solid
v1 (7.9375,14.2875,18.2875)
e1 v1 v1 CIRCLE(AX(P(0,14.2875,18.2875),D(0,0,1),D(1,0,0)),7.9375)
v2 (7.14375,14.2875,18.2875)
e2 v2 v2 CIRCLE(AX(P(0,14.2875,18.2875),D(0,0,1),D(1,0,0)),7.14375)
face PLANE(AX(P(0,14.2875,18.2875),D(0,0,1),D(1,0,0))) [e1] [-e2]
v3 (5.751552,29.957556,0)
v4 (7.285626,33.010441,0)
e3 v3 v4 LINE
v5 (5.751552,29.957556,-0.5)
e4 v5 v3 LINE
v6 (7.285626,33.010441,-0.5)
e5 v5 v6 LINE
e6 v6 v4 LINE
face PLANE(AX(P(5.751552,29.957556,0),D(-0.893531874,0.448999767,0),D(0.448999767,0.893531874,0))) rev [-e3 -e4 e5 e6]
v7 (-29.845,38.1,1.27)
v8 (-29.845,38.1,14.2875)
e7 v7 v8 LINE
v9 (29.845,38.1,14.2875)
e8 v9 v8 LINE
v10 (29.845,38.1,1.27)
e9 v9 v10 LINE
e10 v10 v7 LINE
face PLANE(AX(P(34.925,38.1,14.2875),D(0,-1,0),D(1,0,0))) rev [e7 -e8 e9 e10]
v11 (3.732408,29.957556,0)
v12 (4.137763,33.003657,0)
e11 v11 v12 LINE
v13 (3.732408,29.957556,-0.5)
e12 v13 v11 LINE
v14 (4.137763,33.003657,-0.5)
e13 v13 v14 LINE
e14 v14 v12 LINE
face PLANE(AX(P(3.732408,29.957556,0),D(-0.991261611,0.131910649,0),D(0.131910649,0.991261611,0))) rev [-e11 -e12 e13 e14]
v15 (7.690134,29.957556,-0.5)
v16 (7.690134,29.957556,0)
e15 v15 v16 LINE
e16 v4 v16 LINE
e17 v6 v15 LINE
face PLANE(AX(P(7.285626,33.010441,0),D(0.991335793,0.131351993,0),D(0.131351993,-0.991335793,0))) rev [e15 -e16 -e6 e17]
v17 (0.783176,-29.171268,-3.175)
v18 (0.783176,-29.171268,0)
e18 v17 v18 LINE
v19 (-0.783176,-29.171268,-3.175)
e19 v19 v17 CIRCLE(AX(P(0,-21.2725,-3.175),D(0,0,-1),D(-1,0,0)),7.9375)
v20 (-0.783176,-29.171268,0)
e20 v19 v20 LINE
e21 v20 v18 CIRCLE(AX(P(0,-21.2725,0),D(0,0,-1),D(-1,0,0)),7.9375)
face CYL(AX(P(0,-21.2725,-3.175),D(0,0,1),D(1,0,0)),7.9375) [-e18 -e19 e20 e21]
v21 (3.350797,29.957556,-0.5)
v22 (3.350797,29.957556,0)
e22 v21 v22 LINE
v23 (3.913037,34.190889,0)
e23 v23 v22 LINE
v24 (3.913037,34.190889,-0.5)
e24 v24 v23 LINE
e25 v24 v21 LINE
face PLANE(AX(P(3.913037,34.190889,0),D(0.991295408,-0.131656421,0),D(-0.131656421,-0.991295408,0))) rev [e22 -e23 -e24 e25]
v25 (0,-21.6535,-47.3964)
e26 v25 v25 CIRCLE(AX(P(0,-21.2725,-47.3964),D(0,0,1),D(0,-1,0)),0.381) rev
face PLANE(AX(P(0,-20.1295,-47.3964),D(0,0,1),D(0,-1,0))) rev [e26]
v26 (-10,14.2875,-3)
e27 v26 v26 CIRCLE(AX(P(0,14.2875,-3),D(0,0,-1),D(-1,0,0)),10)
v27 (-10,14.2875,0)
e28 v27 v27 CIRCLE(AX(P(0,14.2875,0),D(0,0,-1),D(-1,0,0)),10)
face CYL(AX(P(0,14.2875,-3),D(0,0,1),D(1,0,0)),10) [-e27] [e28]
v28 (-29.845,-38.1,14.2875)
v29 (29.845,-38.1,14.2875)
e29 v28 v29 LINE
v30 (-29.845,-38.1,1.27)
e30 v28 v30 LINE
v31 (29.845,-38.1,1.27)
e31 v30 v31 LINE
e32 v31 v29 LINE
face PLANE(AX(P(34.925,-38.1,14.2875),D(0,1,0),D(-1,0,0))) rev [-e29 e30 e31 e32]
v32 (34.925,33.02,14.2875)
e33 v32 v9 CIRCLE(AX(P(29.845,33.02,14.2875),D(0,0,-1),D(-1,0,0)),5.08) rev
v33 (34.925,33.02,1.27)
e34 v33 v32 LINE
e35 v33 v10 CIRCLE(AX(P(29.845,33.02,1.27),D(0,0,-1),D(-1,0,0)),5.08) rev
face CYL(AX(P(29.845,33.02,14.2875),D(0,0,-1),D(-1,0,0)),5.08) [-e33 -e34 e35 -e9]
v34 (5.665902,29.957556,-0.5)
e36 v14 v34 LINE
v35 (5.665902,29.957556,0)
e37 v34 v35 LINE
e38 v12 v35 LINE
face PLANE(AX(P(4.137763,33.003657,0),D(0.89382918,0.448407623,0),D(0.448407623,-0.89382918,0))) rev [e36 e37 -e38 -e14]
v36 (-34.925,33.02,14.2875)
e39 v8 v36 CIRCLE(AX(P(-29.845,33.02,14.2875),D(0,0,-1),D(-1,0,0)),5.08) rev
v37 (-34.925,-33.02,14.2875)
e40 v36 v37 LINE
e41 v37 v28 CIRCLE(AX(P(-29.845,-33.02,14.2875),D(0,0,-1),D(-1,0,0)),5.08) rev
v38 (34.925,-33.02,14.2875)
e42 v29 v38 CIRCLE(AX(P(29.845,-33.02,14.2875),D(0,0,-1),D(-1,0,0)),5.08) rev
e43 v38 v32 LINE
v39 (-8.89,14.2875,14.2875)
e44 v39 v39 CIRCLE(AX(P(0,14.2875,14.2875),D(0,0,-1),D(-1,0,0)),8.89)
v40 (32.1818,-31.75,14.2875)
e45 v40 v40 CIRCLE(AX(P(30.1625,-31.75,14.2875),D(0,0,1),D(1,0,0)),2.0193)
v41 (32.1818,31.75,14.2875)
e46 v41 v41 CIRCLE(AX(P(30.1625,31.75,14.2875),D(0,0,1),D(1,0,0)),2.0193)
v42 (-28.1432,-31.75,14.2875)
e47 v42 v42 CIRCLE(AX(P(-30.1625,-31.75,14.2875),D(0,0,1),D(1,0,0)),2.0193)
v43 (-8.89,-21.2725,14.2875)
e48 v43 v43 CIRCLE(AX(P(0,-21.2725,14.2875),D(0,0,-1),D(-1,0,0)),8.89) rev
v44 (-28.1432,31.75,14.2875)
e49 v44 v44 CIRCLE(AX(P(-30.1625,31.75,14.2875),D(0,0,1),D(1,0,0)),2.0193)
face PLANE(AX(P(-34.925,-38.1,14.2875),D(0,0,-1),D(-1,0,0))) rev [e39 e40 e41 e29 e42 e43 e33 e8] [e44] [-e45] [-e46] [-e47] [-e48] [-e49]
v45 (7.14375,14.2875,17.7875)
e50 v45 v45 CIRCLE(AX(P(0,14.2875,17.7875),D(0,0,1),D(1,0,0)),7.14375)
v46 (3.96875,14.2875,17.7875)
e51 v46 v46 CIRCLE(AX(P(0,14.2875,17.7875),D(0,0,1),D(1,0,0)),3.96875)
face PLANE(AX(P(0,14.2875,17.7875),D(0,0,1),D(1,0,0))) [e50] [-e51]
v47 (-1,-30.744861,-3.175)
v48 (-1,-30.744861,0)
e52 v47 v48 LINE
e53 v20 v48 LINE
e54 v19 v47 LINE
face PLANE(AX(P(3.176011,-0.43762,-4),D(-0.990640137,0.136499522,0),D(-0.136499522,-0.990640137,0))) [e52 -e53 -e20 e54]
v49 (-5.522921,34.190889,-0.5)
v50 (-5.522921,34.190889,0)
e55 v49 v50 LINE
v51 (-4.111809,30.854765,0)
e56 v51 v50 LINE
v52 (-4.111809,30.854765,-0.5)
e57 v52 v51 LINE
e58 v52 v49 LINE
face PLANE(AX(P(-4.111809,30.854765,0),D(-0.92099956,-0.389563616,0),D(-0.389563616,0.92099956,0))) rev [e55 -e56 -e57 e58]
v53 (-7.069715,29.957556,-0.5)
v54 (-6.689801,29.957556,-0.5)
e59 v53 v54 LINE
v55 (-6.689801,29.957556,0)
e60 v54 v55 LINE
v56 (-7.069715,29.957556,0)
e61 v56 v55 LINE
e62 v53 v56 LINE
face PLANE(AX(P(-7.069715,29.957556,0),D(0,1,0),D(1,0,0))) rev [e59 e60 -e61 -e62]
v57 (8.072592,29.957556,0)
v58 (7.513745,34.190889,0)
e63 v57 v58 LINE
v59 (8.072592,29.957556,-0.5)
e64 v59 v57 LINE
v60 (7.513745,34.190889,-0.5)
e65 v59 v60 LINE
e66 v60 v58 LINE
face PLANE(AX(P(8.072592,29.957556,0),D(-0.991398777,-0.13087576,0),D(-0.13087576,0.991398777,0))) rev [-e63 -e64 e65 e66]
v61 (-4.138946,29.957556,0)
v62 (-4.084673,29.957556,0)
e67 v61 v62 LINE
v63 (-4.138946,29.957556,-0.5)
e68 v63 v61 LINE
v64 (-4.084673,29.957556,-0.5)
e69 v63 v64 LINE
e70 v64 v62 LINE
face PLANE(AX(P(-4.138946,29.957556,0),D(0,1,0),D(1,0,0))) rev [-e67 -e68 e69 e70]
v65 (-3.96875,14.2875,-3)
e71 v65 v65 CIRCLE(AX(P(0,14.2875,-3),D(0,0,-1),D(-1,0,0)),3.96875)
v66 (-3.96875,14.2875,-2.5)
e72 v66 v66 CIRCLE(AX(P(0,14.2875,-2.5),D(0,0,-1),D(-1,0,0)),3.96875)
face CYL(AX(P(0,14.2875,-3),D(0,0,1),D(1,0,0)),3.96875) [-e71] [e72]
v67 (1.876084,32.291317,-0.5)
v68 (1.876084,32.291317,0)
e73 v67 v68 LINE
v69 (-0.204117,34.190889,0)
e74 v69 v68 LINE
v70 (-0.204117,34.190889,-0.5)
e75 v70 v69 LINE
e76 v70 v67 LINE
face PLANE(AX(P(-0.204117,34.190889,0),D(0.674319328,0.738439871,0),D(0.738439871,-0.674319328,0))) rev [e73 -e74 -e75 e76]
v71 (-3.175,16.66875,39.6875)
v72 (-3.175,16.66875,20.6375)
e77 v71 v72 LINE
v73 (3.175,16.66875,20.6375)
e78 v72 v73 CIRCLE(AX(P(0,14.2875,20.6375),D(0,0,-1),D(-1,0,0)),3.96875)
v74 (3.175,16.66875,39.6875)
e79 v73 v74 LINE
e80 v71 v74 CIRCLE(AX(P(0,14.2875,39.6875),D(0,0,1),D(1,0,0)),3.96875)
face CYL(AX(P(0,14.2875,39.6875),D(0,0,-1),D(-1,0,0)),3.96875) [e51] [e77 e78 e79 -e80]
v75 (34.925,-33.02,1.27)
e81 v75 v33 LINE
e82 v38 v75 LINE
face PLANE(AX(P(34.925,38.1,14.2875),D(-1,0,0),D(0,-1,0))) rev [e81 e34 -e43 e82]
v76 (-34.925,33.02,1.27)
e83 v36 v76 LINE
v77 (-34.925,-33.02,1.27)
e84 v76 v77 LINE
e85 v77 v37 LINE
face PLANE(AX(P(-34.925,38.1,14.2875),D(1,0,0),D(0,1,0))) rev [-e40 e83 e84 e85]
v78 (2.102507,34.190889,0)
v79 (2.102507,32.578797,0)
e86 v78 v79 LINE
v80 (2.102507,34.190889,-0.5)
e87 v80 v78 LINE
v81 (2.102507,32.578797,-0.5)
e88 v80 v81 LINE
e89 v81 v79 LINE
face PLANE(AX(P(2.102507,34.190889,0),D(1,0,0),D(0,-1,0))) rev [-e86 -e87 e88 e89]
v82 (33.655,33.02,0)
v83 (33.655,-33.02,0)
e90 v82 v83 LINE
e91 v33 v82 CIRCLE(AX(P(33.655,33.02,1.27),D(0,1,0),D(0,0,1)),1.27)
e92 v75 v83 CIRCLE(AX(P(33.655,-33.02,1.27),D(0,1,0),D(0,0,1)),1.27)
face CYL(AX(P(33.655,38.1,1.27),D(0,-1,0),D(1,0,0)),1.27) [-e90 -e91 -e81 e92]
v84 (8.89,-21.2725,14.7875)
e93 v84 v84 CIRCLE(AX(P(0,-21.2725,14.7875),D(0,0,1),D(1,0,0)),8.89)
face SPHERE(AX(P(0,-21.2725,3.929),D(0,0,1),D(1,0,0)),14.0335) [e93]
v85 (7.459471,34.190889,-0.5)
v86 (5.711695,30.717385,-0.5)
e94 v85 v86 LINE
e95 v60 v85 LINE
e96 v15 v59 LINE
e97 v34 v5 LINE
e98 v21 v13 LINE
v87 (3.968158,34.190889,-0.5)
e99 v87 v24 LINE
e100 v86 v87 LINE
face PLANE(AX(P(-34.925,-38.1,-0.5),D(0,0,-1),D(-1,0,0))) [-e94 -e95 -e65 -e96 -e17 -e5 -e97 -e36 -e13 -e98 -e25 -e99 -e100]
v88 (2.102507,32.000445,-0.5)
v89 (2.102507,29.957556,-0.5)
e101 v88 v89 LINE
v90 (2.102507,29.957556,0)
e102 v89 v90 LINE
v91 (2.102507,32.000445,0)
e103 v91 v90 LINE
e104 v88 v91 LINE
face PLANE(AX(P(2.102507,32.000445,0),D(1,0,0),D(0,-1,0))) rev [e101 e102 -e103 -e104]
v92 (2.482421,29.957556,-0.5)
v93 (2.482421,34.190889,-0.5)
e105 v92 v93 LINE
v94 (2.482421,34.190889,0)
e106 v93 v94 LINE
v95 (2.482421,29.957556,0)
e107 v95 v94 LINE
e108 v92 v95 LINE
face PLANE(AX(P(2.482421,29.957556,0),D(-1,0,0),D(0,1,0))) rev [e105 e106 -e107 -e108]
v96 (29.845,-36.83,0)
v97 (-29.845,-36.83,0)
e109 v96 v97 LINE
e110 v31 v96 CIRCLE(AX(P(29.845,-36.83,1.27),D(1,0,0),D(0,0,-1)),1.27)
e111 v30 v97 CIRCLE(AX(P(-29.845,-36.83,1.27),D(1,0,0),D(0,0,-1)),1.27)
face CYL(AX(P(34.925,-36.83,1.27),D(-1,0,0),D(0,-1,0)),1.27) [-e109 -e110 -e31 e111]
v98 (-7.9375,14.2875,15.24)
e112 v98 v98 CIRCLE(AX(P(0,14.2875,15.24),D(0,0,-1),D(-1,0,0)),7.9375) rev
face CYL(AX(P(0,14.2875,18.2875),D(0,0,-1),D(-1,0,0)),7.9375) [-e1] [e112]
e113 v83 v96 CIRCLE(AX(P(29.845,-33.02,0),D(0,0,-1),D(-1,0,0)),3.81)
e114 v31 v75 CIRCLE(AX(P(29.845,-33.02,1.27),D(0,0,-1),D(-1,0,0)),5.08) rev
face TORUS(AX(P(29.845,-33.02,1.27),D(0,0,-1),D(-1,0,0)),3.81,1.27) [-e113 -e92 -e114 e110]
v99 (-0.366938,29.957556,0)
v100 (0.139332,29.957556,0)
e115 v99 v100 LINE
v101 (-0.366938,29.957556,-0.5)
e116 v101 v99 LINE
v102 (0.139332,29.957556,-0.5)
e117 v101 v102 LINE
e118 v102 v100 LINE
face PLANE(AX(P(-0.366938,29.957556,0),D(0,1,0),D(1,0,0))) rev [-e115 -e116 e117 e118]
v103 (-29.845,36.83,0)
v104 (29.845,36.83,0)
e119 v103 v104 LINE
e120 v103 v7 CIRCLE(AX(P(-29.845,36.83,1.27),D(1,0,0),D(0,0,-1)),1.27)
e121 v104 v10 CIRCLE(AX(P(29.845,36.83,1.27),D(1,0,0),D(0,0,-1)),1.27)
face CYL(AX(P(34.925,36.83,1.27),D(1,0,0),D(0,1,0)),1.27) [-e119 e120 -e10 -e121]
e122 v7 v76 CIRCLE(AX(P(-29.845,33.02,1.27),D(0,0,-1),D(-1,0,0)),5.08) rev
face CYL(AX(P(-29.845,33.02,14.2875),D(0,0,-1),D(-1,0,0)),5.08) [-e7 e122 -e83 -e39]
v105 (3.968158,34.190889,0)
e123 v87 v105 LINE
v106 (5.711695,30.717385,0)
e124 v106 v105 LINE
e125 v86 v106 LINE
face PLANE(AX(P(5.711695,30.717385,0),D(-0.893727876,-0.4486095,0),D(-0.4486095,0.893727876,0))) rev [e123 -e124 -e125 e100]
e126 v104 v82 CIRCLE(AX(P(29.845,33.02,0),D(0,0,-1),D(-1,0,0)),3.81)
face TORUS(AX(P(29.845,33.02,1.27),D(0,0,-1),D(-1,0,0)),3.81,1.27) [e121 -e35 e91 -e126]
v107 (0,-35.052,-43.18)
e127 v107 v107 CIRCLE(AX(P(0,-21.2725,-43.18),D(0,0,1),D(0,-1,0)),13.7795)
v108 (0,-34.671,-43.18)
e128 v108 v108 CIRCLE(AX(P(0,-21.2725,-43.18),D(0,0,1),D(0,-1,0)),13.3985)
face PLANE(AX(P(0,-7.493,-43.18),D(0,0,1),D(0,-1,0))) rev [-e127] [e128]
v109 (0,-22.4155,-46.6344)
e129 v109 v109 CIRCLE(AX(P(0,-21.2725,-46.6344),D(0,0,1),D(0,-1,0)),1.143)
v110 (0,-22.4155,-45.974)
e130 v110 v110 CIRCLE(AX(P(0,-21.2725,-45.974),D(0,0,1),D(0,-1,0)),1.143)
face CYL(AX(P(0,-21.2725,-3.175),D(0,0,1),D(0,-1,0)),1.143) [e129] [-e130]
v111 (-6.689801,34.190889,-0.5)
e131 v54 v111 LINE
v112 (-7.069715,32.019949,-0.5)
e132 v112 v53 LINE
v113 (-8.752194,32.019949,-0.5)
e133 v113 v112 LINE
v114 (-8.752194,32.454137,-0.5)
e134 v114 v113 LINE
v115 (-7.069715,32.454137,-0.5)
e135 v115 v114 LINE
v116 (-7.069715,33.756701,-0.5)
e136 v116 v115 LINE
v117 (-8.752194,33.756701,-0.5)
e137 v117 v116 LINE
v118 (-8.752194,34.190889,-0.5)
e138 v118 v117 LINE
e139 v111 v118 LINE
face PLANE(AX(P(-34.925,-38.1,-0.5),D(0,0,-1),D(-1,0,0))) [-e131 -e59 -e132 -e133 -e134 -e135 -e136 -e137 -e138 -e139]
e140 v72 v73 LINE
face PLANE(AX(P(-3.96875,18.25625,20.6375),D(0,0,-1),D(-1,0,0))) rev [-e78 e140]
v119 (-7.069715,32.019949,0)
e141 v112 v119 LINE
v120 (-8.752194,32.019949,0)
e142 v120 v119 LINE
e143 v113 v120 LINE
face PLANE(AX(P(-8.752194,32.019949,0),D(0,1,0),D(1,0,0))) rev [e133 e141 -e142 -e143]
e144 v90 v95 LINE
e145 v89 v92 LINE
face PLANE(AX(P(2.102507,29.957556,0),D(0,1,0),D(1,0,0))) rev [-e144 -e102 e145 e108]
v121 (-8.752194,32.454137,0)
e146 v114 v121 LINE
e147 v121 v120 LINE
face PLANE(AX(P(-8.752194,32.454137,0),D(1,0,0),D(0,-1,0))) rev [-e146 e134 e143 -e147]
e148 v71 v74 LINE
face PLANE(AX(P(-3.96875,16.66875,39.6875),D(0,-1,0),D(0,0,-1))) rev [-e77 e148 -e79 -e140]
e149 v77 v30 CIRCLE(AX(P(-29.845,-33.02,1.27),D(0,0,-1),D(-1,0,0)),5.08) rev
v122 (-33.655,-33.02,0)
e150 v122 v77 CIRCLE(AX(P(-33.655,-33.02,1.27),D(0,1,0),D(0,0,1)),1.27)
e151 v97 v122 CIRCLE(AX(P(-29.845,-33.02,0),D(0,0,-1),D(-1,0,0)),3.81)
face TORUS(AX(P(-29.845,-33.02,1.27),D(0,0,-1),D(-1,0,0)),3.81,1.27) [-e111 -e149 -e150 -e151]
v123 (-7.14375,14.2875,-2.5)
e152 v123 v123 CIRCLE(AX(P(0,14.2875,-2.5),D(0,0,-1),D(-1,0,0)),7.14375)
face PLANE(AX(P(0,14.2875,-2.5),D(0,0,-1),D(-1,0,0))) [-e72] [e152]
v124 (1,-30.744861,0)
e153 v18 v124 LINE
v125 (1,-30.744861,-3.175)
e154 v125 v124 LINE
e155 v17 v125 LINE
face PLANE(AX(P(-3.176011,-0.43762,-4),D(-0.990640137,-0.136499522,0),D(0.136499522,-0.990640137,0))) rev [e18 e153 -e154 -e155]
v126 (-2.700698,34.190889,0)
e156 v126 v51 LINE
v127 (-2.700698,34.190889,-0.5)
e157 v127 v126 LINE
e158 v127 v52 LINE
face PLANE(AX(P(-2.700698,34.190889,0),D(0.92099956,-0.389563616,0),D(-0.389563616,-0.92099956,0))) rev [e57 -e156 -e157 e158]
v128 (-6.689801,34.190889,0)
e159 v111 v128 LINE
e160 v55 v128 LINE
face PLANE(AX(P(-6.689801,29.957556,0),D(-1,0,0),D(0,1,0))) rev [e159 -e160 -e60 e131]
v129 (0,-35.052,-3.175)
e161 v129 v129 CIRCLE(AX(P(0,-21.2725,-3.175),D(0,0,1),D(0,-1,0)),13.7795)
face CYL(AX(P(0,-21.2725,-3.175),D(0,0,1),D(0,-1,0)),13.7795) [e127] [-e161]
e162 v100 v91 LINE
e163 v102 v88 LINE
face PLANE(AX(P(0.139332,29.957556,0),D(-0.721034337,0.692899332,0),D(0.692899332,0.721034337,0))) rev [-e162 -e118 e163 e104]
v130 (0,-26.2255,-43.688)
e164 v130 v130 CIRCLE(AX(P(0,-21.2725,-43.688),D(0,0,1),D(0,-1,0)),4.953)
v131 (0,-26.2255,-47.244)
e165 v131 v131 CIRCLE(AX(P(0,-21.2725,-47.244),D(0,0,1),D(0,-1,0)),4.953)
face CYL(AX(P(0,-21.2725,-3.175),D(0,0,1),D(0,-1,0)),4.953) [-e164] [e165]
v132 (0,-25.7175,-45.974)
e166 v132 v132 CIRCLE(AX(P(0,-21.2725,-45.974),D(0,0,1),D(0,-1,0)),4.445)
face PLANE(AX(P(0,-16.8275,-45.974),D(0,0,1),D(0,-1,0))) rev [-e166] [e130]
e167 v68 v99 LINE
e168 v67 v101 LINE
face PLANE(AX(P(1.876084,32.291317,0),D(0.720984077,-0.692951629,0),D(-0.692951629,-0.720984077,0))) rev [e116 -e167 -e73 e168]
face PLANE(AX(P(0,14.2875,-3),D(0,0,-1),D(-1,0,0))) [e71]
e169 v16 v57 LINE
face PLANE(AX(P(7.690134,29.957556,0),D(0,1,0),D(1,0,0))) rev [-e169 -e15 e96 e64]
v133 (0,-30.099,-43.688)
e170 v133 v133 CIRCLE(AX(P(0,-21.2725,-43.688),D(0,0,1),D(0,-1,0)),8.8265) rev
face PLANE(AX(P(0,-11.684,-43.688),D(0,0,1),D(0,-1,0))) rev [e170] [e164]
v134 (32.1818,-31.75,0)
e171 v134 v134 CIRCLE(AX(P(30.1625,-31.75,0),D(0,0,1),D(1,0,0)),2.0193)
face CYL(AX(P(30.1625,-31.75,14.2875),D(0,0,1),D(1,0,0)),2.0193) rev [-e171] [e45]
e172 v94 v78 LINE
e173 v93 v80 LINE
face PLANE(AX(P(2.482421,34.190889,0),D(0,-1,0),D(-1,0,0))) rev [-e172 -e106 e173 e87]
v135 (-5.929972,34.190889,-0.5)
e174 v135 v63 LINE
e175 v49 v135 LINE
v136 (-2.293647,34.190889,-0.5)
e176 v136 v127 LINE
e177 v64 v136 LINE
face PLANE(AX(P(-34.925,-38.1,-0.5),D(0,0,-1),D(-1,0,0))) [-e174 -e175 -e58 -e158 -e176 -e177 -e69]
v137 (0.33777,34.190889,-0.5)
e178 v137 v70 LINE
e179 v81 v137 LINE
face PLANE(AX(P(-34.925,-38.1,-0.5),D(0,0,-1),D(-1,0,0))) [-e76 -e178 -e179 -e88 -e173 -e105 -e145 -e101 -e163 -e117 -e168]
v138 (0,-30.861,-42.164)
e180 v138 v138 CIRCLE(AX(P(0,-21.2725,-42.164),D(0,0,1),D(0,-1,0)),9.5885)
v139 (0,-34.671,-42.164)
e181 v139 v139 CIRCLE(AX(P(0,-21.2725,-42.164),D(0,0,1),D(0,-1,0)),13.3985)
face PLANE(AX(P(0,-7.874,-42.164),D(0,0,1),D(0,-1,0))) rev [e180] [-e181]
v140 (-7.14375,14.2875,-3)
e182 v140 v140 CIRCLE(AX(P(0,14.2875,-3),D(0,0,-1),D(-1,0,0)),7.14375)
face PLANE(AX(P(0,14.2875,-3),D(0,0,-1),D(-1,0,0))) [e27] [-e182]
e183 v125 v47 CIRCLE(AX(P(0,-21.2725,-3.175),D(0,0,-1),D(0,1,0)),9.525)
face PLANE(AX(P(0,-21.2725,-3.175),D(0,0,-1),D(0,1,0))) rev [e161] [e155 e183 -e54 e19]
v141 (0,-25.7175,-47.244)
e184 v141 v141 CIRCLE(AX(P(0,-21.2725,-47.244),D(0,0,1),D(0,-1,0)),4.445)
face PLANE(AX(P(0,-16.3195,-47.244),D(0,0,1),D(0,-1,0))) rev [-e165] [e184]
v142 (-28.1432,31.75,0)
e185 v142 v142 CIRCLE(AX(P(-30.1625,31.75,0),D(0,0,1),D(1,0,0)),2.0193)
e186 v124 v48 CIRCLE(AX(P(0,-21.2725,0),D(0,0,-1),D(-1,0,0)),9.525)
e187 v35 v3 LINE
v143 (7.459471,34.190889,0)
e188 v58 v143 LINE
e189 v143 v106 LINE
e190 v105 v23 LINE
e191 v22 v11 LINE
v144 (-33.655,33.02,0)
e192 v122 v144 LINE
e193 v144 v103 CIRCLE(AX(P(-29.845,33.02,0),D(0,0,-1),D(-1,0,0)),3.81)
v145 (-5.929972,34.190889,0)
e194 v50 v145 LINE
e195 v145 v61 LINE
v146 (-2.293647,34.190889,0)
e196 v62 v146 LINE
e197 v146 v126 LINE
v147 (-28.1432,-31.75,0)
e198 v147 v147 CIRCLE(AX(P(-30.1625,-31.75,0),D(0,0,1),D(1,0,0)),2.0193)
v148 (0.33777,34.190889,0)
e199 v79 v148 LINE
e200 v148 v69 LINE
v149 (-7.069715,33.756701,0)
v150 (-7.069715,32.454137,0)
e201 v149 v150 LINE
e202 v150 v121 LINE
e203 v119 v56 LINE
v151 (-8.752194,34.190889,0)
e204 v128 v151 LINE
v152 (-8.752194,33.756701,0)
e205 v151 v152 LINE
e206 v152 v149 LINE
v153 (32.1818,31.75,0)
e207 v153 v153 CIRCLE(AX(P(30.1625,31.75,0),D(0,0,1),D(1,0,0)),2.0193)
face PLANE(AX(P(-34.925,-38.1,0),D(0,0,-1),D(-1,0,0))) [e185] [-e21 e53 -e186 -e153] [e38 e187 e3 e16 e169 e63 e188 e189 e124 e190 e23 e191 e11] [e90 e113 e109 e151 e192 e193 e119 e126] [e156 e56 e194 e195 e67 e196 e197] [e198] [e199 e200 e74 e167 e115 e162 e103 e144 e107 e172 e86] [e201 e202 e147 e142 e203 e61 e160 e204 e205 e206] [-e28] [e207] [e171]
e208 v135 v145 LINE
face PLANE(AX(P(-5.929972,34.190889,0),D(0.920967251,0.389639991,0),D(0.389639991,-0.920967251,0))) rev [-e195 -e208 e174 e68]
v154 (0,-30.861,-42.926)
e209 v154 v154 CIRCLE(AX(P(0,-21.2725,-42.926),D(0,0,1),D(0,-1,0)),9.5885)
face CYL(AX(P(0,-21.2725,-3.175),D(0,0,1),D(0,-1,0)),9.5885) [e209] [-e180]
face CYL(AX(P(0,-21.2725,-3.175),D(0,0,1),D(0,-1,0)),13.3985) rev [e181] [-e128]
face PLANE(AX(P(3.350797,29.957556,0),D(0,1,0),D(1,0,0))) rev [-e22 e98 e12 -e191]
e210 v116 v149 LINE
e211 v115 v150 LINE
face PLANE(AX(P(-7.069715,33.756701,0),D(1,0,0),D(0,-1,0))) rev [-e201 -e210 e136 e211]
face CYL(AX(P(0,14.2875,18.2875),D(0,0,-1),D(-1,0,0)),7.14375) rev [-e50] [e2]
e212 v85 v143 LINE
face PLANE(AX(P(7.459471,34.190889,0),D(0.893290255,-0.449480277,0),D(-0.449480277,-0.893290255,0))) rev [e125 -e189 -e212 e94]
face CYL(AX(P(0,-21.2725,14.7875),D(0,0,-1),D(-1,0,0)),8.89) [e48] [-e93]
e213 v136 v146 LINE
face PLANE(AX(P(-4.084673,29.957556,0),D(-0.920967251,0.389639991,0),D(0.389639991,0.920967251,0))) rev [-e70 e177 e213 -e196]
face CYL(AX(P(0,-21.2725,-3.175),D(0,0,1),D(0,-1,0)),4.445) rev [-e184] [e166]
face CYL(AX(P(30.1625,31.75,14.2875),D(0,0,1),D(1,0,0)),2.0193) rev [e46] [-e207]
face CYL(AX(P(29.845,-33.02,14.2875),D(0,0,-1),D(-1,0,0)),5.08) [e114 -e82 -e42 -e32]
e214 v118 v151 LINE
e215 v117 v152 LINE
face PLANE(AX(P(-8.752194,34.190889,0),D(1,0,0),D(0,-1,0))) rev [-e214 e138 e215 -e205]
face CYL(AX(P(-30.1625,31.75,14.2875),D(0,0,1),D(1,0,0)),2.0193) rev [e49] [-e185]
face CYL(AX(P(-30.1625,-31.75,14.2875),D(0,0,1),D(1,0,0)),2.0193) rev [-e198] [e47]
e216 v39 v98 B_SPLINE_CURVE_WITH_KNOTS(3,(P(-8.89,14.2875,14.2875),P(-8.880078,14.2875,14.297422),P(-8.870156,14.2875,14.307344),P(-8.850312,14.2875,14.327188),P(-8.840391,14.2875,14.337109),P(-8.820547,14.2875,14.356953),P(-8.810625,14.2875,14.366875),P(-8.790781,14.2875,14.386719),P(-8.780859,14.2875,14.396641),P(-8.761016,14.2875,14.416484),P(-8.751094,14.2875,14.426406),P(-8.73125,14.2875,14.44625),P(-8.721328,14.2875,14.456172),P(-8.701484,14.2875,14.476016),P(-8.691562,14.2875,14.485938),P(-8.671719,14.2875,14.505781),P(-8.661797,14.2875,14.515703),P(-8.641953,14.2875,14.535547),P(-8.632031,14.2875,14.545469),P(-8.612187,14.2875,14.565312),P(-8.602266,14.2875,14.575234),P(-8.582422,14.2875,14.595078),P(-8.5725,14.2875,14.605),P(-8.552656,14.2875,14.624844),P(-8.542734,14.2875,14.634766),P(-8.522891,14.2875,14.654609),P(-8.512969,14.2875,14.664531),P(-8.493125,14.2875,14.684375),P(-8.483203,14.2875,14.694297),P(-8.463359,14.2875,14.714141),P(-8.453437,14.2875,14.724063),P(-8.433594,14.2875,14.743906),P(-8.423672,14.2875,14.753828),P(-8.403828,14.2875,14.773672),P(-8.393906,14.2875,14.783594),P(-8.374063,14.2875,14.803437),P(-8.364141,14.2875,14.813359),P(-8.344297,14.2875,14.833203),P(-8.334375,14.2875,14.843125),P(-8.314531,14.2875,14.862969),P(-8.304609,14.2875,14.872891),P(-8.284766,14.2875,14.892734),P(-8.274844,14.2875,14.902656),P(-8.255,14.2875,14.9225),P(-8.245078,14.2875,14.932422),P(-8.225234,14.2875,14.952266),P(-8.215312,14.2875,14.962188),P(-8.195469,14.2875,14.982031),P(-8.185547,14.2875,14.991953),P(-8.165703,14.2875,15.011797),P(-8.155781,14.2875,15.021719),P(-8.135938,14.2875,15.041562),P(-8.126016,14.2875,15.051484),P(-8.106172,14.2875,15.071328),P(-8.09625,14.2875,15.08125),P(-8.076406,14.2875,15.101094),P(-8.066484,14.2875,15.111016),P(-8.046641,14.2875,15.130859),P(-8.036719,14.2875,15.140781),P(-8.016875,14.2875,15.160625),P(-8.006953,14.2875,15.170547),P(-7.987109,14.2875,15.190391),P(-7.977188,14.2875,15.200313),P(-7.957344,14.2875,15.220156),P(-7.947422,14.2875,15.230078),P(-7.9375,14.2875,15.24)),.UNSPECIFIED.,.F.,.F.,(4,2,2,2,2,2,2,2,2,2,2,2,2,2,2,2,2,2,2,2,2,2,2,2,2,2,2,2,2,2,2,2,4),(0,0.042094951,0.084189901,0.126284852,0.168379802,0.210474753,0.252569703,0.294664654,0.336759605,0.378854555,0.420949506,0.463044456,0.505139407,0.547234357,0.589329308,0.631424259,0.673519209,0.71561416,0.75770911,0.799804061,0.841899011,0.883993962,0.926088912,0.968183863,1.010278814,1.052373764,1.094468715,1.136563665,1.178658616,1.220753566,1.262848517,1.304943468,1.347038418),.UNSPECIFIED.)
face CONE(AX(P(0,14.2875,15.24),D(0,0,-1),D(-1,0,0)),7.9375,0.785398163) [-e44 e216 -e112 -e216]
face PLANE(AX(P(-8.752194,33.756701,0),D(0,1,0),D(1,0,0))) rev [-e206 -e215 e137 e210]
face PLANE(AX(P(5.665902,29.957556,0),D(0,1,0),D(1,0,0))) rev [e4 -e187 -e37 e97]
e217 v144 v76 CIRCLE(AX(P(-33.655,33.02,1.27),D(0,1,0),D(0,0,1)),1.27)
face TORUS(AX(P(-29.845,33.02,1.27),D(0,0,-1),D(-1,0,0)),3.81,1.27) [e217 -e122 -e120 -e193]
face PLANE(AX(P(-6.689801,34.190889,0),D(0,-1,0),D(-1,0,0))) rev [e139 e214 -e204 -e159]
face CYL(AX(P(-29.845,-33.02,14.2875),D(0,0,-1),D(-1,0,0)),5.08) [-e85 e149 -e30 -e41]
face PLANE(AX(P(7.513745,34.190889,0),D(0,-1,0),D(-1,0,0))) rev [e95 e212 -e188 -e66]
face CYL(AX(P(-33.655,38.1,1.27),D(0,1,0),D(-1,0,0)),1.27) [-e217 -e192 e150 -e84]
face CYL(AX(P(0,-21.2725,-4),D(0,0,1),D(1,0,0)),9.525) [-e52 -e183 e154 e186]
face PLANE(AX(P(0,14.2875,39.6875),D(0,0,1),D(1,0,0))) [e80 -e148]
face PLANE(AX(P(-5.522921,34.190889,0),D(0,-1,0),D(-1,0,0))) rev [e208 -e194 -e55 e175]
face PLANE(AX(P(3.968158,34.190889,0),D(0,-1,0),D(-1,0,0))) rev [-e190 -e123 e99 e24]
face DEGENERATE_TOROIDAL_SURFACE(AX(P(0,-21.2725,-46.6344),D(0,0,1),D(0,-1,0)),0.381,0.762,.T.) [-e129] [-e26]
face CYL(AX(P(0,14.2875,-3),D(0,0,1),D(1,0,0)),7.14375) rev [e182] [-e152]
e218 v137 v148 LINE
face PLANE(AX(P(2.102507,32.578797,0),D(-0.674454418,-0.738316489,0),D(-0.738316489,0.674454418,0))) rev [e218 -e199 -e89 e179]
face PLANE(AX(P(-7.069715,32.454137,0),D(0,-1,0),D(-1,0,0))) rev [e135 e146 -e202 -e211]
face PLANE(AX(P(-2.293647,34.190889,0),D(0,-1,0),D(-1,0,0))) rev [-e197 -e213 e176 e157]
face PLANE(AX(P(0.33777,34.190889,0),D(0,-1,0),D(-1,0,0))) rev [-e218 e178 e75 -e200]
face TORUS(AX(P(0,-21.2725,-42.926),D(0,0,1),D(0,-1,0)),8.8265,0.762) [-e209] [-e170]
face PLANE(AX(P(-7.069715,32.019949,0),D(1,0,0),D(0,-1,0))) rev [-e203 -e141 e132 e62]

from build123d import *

# Parameters (mm, degrees)
CROQUIS1_W              = 69.85
CROQUIS1_H              = 76.2
EXTRUIR1_DEPTH          = 14.2875
CROQUIS2_R              = 7.9375
CROQUIS2_R_2            = 7.14375
EXTRUIR2_DEPTH          = 4
CROQUIS3_R              = 7.14375
CROQUIS3_R_2            = 3.96875
EXTRUIR3_DEPTH          = 3.5
CROQUIS4_R              = 3.96875
EXTRUIR4_DEPTH          = 25.4
CROQUIS5_W              = 19.05
CROQUIS5_H              = 1.5875
EXTRUIR5_DEPTH          = 3.96875
TALADRO_ROSCADO_10_32_D = 4.0386
CROQUIS7_R              = 8.89
EXTRUIR6_DEPTH          = 0.5
REDONDEO1_R             = 5.08
EXTRUIR7_START          = 3
CROQUIS8_R              = 10
CROQUIS8_R_2            = 7.14375
EXTRUIR7_DEPTH          = 3
EXTRUIR8_START          = 2.5
CROQUIS9_R              = 7.14375
CROQUIS9_R_2            = 3.96875
EXTRUIR8_DEPTH          = 2.5
EXTRUIR9_START          = 3
CROQUIS10_R             = 3.96875
EXTRUIR9_DEPTH          = 3
ENVOLVER1_DEPTH         = 0.5
REDONDEO3_R             = 1.27
CROQUIS15_R             = 7.9375
EXTRUIR13_DEPTH         = 3.175
EXTRUIR14_DEPTH         = 4
FILLET1_R               = 0.762
CHAMFER1_SIZE           = 0.9525


with BuildPart() as part:
    # Croquis1 → Extruir1 (new body)
    with BuildSketch(Plane.XY):
        Rectangle(CROQUIS1_W, CROQUIS1_H)
    extrude(amount=EXTRUIR1_DEPTH)

    # Croquis2 → Extruir2 (add)
    with BuildSketch(Plane.XY.offset(14.2875)):
        with Locations(Location((0, 14.2875, 0), (0, 0, 180))):
            Circle(CROQUIS2_R)
        with Locations((0, 14.2875)):
            Circle(CROQUIS2_R_2, mode=Mode.SUBTRACT)
    extrude(amount=EXTRUIR2_DEPTH)

    # Croquis3 → Extruir3 (add)
    with BuildSketch(Plane.XY.offset(14.2875)):
        with Locations((0, 14.2875)):
            Circle(CROQUIS3_R)
        with Locations((0, 14.2875)):
            Circle(CROQUIS3_R_2, mode=Mode.SUBTRACT)
    extrude(amount=EXTRUIR3_DEPTH)

    # Croquis4 → Extruir4 (add)
    with BuildSketch(Plane.XY.offset(14.2875)):
        with Locations((0, 14.2875)):
            Circle(CROQUIS4_R)
    extrude(amount=EXTRUIR4_DEPTH)

    # Croquis5 → Extruir5 (cut, symmetric)
    with BuildSketch(Plane(origin=(0, 0, 0), x_dir=(0, 0, -1), z_dir=(1, 0, 0))):
        with Locations((-30.1625, 17.4625)):
            Rectangle(CROQUIS5_W, CROQUIS5_H)
    extrude(amount=EXTRUIR5_DEPTH, both=True, mode=Mode.SUBTRACT)

    # Taladro roscado #10-32 (through all)
    with Locations(Plane(origin=(30.1625, 31.75, 14.2875), x_dir=(1, 0, 0), z_dir=(0, 0, 1))):
        with Locations((0, 0), (-60.325, 0), (-60.325, -63.5), (0, -63.5)):
            Hole(TALADRO_ROSCADO_10_32_D / 2)

    # Croquis7 → Extruir6 (add)
    with BuildSketch(Plane.XY.offset(14.2875)):
        with Locations(Location((0, -21.2725, 0), (0, 0, 180))):
            Circle(CROQUIS7_R)
    extrude(amount=EXTRUIR6_DEPTH)

    # Cúpula1: read off the stored shape, not the designer's step
    # Cúpula1 outline → Cúpula1 (revolve)
    with BuildSketch(Plane.XZ.offset(21.2725)):
        with BuildLine():
            Line((0, 14.7875), (8.890000011, 14.787499991))
            ThreePointArc((8.890000011, 14.787499991), (4.719976834, 17.144935114), (0, 17.9625))
            Line((0, 17.9625), (0, 14.7875))
        make_face()
    revolve(axis=Axis((0, -21.2725, 0), (0, 0, 1)))

    # Redondeo1
    redondeo1_edges = [part.edges().sort_by_distance(p)[0] for p in [
        (-34.925, 38.1, 7.14375),
        (34.925, 38.1, 7.14375),
        (34.925, -38.1, 7.14375),
        (-34.925, -38.1, 7.14375),
    ]]
    fillet(redondeo1_edges, radius=REDONDEO1_R)

    # Croquis8 → Extruir7 (add)
    with BuildSketch(Plane(origin=(0, 0, 0), x_dir=(-1, 0, 0), z_dir=(0, 0, -1)).offset(EXTRUIR7_START)):
        with Locations((0, 14.2875)):
            Circle(CROQUIS8_R)
        with Locations(Location((0, 14.2875, 0), (0, 0, 180))):
            Circle(CROQUIS8_R_2, mode=Mode.SUBTRACT)
    extrude(amount=-EXTRUIR7_DEPTH)

    # Croquis9 → Extruir8 (add)
    with BuildSketch(Plane(origin=(0, 0, 0), x_dir=(-1, 0, 0), z_dir=(0, 0, -1)).offset(EXTRUIR8_START)):
        with Locations(Location((0, 14.2875, 0), (0, 0, 180))):
            Circle(CROQUIS9_R)
        with Locations(Location((0, 14.2875, 0), (0, 0, 36.869897646))):
            Circle(CROQUIS9_R_2, mode=Mode.SUBTRACT)
    extrude(amount=-EXTRUIR8_DEPTH)

    # Croquis10 → Extruir9 (add)
    with BuildSketch(Plane(origin=(0, 0, 0), x_dir=(-1, 0, 0), z_dir=(0, 0, -1)).offset(EXTRUIR9_START)):
        with Locations(Location((0, 14.2875, 0), (0, 0, 36.869897646))):
            Circle(CROQUIS10_R)
    extrude(amount=-EXTRUIR9_DEPTH)

    # Envolver1: read off the stored shape, not the designer's step
    # Envolver1 outline → Envolver1 (add)
    with BuildSketch(Plane(origin=(0, 0, 0), x_dir=(-1, 0, 0), z_dir=(0, 0, -1))):
        Polygon((-7.459471243, 34.190889413), (-7.513744748, 34.190889413), (-8.072592237, 29.957556079), (-7.690133636, 29.957556079), (-7.285626425, 33.010440695), (-5.751551906, 29.957556079), (-5.665901532, 29.957556079), (-4.137763177, 33.003656507), (-3.732407942, 29.957556079), (-3.350797365, 29.957556079), (-3.913036948, 34.190889413), (-3.968158476, 34.190889413), (-5.711694801, 30.717385139), align=None)
        Polygon((0.204117165, 34.190889413), (-0.337769854, 34.190889413), (-2.102506767, 32.578796731), (-2.102506767, 34.190889413), (-2.482421297, 34.190889413), (-2.482421297, 29.957556079), (-2.102506767, 29.957556079), (-2.102506767, 32.000444701), (-0.139332354, 29.957556079), (0.366937678, 29.957556079), (-1.876084491, 32.291316763), align=None)
        Polygon((5.929971866, 34.190889413), (5.522920584, 34.190889413), (4.111809472, 30.854764947), (2.700698361, 34.190889413), (2.293647079, 34.190889413), (4.08467272, 29.957556079), (4.138946225, 29.957556079), align=None)
        Polygon((8.752194088, 34.190889413), (6.689800925, 34.190889413), (6.689800925, 29.957556079), (7.069715455, 29.957556079), (7.069715455, 32.019949242), (8.752194088, 32.019949242), (8.752194088, 32.454137276), (7.069715455, 32.454137276), (7.069715455, 33.756701379), (8.752194088, 33.756701379), align=None)
    extrude(amount=ENVOLVER1_DEPTH)

    # Redondeo3
    redondeo3_edges = [part.edges().sort_by_distance(p)[0] for p in [
        (0, -38.1, 0),
        (-34.925, 0, 0),
        (0, 38.1, 0),
        (34.925, 0, 0),
        (-33.437102448, 36.612102448, 0),
        (33.437102448, 36.612102448, 0),
        (33.437102448, -36.612102448, 0),
        (-33.437102448, -36.612102448, 0),
    ]]
    fillet(redondeo3_edges, radius=REDONDEO3_R)

    # Croquis15 → Extruir13 (add)
    with BuildSketch(Plane(origin=(0, 0, 0), x_dir=(-1, 0, 0), z_dir=(0, 0, -1))):
        with Locations((0, -21.2725)):
            Circle(CROQUIS15_R)
    extrude(amount=EXTRUIR13_DEPTH)

    # Croquis16 → Extruir14 (add)
    with BuildSketch(Plane(origin=(0, 0, 0), x_dir=(-1, 0, 0), z_dir=(0, 0, -1))):
        with BuildLine():
            Line((-0.783175899, -29.17126837), (-1, -30.74486111))
            ThreePointArc((-1, -30.74486111), (0, -30.7975), (1, -30.74486111))
            Line((1, -30.74486111), (0.783175899, -29.17126837))
            ThreePointArc((0.783175899, -29.17126837), (0, -29.21), (-0.783175899, -29.17126837))
        make_face()
    extrude(amount=EXTRUIR14_DEPTH)

    # Recubrir1: read off the stored shape, not the designer's step
    # Recubrir1: loft between two sections, ruled curve by curve
    recubrir1_from = [
        Edge.make_bspline([(-1.31936525, -16.449712908, -3.175), (8.326208935, -13.810982408, -3.175), (10.964939434, -23.456556593, -3.175), (1.31936525, -26.095287092, -3.175), (-8.326208935, -28.734017592, -3.175), (-10.964939434, -19.088443407, -3.175), (-1.31936525, -16.449712908, -3.175)], [0, 0, 0, 0, 0.5, 0.5, 0.5, 1, 1, 1, 1], 3, [1, 0.333333333, 0.333333333, 1, 0.333333333, 0.333333333, 1]),
    ]
    recubrir1_to = [
        Edge.make_bspline([(-2.957878031, -20.118557821, -4.675), (-0.649993674, -14.202801759, -4.675), (5.265762389, -16.510686116, -4.675), (2.957878031, -22.426442179, -4.675), (0.649993674, -28.342198241, -4.675), (-5.265762389, -26.034313884, -4.675), (-2.957878031, -20.118557821, -4.675)], [0, 0, 0, 0, 0.5, 0.5, 0.5, 1, 1, 1, 1], 3, [1, 0.333333333, 0.333333333, 1, 0.333333333, 0.333333333, 1]),
    ]
    recubrir1 = Solid(Shell([*[Face.make_surface_from_curves(recubrir1_from[k], recubrir1_to[k]) for k in range(1)], Face(Wire(recubrir1_from)), Face(Wire(recubrir1_to))]))
    add(recubrir1)

    # Sketch2 → Revolve1 (revolve)
    with BuildSketch(Plane(origin=(0, 0, 0), x_dir=(0, 0, -1), z_dir=(1, 0, 0)), mode=Mode.PRIVATE) as revolve1_sk:
        Polygon((3.175, -21.2725), (47.3964, -21.2725), (47.3964, -20.1295), (45.974, -20.1295), (45.974, -16.8275), (47.244, -16.8275), (47.244, -16.3195), (43.688, -16.3195), (43.688, -11.684), (42.164, -11.684), (42.164, -7.874), (43.18, -7.874), (43.18, -7.493), (3.175, -7.493), align=None)
    revolve(revolve1_sk.sketch.rotate(Axis((0, -21.2725, -3.175), (0, 0, -1)), 180), axis=Axis((0, -21.2725, -3.175), (0, 0, -1)))

    # Fillet1
    fillet1_edges = [part.edges().sort_by_distance(p)[0] for p in [
        (0, -11.684, -43.688),
        (0, -20.1295, -47.3964),
    ]]
    fillet(fillet1_edges, radius=FILLET1_R)

    # Chamfer1
    chamfer1_edges = [part.edges().sort_by_distance(p)[0] for p in [
        (7.9375, 14.2875, 14.2875),
    ]]
    chamfer(chamfer1_edges, length=CHAMFER1_SIZE)


solid = part.part
